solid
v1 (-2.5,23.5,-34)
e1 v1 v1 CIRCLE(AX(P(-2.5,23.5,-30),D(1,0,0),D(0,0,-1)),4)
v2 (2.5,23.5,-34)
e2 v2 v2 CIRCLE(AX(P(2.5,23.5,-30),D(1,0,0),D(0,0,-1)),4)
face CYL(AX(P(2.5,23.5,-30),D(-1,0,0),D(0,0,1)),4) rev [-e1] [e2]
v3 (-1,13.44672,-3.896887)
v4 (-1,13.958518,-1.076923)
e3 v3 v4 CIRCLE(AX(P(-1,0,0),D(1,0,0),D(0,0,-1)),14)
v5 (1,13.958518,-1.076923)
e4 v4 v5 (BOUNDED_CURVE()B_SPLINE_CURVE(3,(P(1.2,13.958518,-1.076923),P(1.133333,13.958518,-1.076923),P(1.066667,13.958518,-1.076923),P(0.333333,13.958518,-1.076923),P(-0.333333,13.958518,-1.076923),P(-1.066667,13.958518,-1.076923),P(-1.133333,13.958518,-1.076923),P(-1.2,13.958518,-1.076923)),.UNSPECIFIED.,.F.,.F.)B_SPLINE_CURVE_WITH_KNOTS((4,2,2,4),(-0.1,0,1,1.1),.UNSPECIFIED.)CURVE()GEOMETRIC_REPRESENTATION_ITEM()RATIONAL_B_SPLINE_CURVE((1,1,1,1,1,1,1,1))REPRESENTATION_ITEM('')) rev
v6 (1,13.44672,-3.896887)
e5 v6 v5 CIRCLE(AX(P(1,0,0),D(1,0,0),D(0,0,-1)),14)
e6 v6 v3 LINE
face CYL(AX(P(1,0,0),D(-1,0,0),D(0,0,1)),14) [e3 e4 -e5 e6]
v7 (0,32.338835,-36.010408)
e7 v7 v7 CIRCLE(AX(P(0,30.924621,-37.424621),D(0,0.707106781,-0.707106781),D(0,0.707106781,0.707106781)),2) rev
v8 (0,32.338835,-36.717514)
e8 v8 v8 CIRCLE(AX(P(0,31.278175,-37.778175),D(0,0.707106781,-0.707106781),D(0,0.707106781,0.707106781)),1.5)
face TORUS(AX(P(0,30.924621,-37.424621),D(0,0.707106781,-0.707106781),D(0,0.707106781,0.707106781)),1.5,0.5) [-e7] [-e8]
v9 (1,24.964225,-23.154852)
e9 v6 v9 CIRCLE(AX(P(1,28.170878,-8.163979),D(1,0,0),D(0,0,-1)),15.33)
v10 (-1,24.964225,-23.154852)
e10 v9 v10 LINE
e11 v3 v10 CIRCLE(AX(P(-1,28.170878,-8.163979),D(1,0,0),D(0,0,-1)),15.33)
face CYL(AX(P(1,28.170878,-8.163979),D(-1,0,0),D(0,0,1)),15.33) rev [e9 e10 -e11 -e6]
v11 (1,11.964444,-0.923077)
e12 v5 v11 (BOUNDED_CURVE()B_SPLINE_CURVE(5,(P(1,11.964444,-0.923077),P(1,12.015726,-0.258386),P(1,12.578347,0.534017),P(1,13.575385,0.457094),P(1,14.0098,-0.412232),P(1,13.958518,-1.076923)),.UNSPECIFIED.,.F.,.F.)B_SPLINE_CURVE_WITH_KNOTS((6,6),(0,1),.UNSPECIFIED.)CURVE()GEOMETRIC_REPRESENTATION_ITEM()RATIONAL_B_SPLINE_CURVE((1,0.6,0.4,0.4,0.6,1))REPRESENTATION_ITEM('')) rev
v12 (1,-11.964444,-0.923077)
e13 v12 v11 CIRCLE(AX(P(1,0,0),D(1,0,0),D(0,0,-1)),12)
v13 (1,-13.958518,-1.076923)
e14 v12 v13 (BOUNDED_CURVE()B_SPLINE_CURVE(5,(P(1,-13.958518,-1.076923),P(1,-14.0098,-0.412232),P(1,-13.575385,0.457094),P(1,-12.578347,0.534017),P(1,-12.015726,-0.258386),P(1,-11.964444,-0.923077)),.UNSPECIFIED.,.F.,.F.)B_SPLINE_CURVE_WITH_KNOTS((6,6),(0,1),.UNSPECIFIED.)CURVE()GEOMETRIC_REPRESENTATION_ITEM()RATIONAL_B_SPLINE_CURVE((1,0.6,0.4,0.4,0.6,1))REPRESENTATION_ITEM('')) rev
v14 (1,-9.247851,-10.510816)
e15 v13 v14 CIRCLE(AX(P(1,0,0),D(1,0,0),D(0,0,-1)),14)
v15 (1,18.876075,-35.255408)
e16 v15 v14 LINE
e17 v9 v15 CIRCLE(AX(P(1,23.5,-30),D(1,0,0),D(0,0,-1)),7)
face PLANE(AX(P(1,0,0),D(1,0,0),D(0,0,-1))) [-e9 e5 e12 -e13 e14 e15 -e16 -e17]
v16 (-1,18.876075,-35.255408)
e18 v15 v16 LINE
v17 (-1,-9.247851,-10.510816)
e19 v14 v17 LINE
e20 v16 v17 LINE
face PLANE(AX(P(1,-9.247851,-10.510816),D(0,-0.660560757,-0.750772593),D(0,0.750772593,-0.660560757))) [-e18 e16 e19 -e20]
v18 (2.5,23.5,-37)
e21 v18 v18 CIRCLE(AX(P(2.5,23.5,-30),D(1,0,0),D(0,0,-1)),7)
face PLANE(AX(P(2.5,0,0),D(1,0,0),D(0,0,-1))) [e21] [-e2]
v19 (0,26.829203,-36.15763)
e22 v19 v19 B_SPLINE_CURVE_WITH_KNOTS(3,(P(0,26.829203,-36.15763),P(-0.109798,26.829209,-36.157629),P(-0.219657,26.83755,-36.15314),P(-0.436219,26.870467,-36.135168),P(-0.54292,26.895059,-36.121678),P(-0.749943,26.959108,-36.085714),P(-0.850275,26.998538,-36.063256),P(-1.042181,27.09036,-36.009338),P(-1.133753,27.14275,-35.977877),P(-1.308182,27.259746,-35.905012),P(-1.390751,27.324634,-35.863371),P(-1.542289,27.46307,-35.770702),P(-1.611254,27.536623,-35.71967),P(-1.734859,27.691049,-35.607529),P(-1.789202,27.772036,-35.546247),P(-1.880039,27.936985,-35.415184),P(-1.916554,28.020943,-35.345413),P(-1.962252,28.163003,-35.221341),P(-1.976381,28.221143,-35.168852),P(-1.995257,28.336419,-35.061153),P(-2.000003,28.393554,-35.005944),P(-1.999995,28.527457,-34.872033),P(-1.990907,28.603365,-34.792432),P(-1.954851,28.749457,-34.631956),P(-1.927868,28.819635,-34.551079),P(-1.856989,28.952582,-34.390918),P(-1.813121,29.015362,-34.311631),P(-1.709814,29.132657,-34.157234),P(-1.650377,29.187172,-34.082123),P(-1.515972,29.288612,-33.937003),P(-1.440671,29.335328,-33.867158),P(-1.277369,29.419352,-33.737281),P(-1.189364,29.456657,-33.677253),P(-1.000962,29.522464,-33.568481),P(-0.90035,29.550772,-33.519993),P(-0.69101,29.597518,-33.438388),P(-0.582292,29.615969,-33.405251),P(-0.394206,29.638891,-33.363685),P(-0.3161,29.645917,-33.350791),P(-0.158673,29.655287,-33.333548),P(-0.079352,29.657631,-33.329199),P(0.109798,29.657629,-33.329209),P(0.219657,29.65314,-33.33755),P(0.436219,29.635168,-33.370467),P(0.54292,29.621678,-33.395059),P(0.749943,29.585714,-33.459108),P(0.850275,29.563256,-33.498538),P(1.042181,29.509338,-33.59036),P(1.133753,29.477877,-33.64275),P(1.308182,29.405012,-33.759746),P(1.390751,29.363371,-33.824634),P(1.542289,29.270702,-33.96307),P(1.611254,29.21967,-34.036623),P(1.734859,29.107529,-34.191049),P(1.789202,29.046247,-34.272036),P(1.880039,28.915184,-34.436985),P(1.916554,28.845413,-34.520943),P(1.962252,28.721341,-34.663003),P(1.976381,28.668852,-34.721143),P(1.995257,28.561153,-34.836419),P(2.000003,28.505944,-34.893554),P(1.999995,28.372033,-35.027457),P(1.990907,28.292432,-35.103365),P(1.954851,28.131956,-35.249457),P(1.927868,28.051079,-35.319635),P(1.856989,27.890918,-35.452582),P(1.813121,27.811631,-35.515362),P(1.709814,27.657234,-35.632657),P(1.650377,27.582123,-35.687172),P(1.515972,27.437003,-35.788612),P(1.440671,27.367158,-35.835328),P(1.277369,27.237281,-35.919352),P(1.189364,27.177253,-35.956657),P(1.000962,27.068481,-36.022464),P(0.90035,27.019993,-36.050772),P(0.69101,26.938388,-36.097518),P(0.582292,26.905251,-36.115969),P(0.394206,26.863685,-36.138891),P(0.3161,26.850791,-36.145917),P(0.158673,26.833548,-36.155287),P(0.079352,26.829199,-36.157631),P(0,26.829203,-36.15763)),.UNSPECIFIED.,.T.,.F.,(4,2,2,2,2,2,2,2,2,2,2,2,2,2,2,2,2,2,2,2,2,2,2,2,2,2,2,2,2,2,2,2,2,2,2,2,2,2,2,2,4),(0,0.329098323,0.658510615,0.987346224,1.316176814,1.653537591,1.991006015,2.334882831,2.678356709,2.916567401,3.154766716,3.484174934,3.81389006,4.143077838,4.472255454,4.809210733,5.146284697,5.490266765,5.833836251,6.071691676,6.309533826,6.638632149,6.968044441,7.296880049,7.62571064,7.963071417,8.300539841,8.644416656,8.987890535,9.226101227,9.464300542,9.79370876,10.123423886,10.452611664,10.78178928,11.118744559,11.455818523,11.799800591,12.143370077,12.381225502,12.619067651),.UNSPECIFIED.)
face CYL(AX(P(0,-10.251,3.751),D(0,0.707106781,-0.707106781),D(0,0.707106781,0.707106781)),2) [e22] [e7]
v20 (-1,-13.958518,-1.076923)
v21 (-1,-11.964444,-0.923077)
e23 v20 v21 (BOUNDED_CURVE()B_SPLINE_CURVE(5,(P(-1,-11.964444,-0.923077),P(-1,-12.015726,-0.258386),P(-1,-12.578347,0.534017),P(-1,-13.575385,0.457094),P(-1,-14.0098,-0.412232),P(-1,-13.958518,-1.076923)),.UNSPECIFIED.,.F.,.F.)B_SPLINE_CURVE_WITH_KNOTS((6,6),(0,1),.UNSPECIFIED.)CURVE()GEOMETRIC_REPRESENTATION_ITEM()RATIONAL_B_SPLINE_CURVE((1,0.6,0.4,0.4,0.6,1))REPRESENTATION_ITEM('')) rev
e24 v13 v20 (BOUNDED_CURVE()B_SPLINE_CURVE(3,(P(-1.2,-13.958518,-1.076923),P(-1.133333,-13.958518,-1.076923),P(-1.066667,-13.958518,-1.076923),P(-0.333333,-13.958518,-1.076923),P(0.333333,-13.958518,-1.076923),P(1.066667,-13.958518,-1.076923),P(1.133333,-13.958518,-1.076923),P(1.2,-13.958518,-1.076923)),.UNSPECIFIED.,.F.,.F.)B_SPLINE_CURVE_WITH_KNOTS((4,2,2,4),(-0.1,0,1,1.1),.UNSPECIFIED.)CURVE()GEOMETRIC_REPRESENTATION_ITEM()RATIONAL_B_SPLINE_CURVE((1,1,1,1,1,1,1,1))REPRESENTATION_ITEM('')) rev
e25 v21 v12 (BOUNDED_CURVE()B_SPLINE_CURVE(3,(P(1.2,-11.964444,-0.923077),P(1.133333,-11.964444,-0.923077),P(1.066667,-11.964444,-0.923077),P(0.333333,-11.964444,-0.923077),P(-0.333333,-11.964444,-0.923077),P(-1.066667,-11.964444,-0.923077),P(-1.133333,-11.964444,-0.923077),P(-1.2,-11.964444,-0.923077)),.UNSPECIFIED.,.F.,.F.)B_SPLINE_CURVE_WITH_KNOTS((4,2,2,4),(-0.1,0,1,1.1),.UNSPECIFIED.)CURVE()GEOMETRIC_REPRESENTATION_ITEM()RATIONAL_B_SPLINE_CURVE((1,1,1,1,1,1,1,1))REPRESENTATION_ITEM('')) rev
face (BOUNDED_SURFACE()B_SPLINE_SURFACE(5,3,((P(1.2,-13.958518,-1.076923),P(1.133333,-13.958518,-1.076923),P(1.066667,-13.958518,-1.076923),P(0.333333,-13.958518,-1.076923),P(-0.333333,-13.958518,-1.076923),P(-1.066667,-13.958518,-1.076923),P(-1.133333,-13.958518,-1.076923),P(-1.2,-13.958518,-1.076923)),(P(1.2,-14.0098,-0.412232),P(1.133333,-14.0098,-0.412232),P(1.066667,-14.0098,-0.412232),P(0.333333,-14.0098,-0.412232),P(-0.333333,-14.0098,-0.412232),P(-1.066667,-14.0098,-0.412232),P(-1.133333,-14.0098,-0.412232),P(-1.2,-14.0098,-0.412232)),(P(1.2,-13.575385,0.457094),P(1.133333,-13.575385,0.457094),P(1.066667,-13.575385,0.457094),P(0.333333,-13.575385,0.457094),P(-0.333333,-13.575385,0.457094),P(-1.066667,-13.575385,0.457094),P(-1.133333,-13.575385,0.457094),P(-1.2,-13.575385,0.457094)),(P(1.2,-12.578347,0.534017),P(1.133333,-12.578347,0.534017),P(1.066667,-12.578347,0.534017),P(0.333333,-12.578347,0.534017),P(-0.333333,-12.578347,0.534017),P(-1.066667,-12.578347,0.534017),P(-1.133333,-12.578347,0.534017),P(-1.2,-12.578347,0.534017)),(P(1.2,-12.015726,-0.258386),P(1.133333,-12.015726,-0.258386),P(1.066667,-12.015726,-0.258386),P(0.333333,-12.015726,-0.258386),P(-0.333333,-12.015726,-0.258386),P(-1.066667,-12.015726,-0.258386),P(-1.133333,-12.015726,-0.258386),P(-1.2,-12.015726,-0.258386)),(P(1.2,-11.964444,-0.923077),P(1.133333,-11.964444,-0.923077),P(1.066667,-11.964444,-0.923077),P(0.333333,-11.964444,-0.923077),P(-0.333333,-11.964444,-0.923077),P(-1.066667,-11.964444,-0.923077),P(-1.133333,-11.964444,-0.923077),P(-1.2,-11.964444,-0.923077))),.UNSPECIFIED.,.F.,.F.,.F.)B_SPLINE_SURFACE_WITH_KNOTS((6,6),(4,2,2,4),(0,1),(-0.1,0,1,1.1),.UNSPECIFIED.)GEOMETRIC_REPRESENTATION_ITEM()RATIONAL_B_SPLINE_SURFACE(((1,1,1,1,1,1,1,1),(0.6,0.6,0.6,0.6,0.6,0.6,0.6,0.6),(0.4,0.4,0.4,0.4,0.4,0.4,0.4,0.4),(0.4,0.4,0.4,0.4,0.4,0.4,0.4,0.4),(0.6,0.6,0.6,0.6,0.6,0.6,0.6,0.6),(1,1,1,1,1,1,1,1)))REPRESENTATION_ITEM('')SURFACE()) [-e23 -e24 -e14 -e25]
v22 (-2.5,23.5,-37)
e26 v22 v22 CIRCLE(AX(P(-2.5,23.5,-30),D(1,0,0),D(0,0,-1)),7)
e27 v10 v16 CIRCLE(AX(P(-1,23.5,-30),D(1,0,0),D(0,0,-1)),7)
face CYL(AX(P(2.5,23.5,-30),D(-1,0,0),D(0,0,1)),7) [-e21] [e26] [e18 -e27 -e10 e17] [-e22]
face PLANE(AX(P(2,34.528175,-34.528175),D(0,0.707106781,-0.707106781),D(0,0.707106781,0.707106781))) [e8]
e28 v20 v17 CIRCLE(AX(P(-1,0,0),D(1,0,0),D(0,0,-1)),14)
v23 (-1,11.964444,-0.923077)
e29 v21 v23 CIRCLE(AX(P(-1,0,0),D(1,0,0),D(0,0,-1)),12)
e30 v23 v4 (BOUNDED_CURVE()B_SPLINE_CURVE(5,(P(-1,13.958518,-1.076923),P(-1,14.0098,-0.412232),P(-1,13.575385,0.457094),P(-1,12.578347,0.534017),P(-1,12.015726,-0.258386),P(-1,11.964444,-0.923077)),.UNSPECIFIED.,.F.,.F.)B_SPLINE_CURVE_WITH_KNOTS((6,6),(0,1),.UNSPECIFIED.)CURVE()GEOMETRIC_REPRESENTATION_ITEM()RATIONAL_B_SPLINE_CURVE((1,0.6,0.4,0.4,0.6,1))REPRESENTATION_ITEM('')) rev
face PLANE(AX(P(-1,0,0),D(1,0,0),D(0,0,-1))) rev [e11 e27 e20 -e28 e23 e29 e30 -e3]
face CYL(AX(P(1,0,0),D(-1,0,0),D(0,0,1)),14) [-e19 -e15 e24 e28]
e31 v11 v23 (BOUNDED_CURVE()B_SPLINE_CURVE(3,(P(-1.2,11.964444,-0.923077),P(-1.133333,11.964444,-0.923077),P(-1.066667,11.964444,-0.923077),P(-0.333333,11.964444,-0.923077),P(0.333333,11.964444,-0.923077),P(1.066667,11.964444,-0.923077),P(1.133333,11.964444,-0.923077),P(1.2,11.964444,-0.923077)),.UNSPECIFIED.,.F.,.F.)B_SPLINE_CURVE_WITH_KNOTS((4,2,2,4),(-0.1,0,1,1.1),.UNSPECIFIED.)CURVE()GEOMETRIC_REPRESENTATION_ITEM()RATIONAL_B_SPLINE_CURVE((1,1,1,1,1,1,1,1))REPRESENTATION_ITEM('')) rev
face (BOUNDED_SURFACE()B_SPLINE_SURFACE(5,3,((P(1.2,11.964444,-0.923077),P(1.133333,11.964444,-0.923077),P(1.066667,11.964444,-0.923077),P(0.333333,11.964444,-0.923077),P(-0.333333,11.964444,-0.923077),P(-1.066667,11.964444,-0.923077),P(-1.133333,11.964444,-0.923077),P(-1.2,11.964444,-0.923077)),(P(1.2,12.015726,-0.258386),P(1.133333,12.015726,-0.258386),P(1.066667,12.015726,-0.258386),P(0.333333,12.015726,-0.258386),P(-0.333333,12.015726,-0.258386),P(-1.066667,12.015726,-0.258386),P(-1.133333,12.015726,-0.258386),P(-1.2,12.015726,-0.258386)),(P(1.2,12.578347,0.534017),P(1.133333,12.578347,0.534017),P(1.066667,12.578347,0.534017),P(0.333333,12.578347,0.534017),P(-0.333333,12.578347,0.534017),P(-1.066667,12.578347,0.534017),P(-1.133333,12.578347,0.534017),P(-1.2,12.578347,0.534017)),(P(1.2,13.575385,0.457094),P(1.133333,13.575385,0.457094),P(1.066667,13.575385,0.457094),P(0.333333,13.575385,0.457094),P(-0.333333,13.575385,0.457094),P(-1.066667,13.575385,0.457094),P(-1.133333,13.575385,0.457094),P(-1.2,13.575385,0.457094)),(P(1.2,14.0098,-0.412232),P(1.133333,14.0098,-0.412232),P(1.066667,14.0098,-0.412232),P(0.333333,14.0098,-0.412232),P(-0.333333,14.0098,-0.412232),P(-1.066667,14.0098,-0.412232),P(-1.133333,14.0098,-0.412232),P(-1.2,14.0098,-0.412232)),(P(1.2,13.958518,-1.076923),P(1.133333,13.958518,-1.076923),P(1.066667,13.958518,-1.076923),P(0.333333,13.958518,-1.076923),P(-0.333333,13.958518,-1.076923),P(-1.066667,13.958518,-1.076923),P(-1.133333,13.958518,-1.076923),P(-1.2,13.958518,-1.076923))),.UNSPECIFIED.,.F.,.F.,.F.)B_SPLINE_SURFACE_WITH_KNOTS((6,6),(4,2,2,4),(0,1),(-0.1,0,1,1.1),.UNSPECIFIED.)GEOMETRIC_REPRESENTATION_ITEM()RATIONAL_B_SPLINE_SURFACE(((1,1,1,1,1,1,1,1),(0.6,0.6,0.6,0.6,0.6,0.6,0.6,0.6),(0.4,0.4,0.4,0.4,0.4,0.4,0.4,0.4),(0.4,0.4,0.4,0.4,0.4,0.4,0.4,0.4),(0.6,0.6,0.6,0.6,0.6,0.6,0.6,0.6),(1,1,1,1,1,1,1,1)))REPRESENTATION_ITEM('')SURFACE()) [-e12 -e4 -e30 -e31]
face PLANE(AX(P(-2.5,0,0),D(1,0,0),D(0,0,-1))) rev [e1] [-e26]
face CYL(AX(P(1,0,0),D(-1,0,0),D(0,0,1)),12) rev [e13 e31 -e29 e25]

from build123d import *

# Parameters (mm, degrees)
BOSS_EXTRUDE1_DEPTH     = 1
SKETCH1_3_R             = 7
SKETCH1_3_R_2           = 4
BOSS_EXTRUDE2_DEPTH     = 2.5
BOSS_EXTRUDE3_DEPTH     = 2
CUT_EXTRUDE1_REACH      = 61.611
CUT_EXTRUDE1_END_RADIUS = 7
FILLET1_R               = 0.5
FILLET2_START           = -2
FILLET2_DEPTH           = 4
FILLET3_START           = -2
FILLET3_DEPTH           = 4


with BuildPart() as part:
    # Sketch1 → Boss-Extrude1 (new, symmetric)
    with BuildSketch(Plane.YZ):
        with BuildLine():
            Line((-9.247850598, -10.510816301), (18.876074701, -35.255408151))
            ThreePointArc((18.876074701, -35.255408151), (17.246857686, -26.853857727), (24.964224943, -23.154852426))
            ThreePointArc((24.964224943, -23.154852426), (15.014290028, -16.032467293), (13.446719603, -3.896887464))
            ThreePointArc((13.446719603, -3.896887464), (13.860989763, -1.967984445), (14, 0))
            Line((14, 0), (12, 0))
            ThreePointArc((12, 0), (0, -12), (-12, 0))
            Line((-12, 0), (-14, 0))
            ThreePointArc((-14, 0), (-12.756761117, -5.767585788), (-9.247850598, -10.510816301))
        make_face()
    extrude(amount=BOSS_EXTRUDE1_DEPTH, both=True)

    # Sketch1<3> → Boss-Extrude2 (add, symmetric)
    with BuildSketch(Plane.YZ):
        with Locations(Location((23.5, -30, 0), (0, 0, 270))):
            Circle(SKETCH1_3_R)
        with Locations(Location((23.5, -30, 0), (0, 0, 270))):
            Circle(SKETCH1_3_R_2, mode=Mode.SUBTRACT)
    extrude(amount=BOSS_EXTRUDE2_DEPTH, both=True)

    # Sketch1<4> → Boss-Extrude3 (add, symmetric)
    with BuildSketch(Plane.YZ):
        with BuildLine():
            ThreePointArc((29.657630053, -33.329202928), (29.11248608, -34.183300133), (28.449747468, -34.949747468))
            Line((28.449747468, -34.949747468), (31.278174593, -37.778174593))
            Line((31.278174593, -37.778174593), (32.692388155, -36.363961031))
            Line((32.692388155, -36.363961031), (29.657630053, -33.329202928))
        make_face()
        with BuildLine():
            ThreePointArc((28.449747468, -34.949747468), (27.683300133, -35.61248608), (26.829202928, -36.157630053))
            Line((26.829202928, -36.157630053), (29.863961031, -39.192388155))
            Line((29.863961031, -39.192388155), (31.278174593, -37.778174593))
            Line((31.278174593, -37.778174593), (28.449747468, -34.949747468))
        make_face()
    extrude(amount=BOSS_EXTRUDE3_DEPTH, both=True)

    # Cut-Extrude1: up to this cylinder (the profile starts outside it)
    cut_extrude1_end = Plane(origin=(0, 23.5, -30), z_dir=(-1, 0, 0)) * Cylinder(CUT_EXTRUDE1_END_RADIUS, 141.328528, mode=Mode.PRIVATE)
    # Sketch2 → Cut-Extrude1 (cut, up to the surface)
    with BuildSketch(Plane(origin=(0, 34.528174593, -34.528174593), x_dir=(-1, 0, 0), z_dir=(0, 0.707106781186549, -0.7071067811865461)), mode=Mode.PRIVATE) as cut_extrude1_sk1:
        with BuildLine():
            ThreePointArc((-2, -4.596194078), (-1.414213562, -3.181980515), (0, -2.596194078))
            Line((0, -2.596194078), (-2, -2.596194078))
            Line((-2, -2.596194078), (-2, -4.596194078))
        make_face()
    cut_extrude1_tool1 = extrude(cut_extrude1_sk1.sketch, amount=-CUT_EXTRUDE1_REACH, mode=Mode.PRIVATE) - cut_extrude1_end
    add(cut_extrude1_tool1.solids().sort_by_distance((1.553264, 32.376498, -36.679851))[0], mode=Mode.SUBTRACT)
    # Sketch2 → Cut-Extrude1 (cut, up to the surface)
    with BuildSketch(Plane(origin=(0, 34.528174593, -34.528174593), x_dir=(-1, 0, 0), z_dir=(0, 0.707106781186549, -0.7071067811865461)), mode=Mode.PRIVATE) as cut_extrude1_sk2:
        with BuildLine():
            ThreePointArc((0, -2.596194078), (1.414213562, -3.181980515), (2, -4.596194078))
            Line((2, -4.596194078), (2, -2.596194078))
            Line((2, -2.596194078), (0, -2.596194078))
        make_face()
    cut_extrude1_tool2 = extrude(cut_extrude1_sk2.sketch, amount=-CUT_EXTRUDE1_REACH, mode=Mode.PRIVATE) - cut_extrude1_end
    add(cut_extrude1_tool2.solids().sort_by_distance((-1.553264, 32.376498, -36.679851))[0], mode=Mode.SUBTRACT)
    # Sketch2 → Cut-Extrude1 (cut, up to the surface)
    with BuildSketch(Plane(origin=(0, 34.528174593, -34.528174593), x_dir=(-1, 0, 0), z_dir=(0, 0.707106781186549, -0.7071067811865461)), mode=Mode.PRIVATE) as cut_extrude1_sk3:
        with BuildLine():
            Line((1.9e-08, -6.596194078), (2, -6.596194078))
            Line((2, -6.596194078), (2, -4.596194078))
            ThreePointArc((2, -4.596194078), (1.414213569, -6.010407633), (1.9e-08, -6.596194078))
        make_face()
    cut_extrude1_tool3 = extrude(cut_extrude1_sk3.sketch, amount=-CUT_EXTRUDE1_REACH, mode=Mode.PRIVATE) - cut_extrude1_end
    add(cut_extrude1_tool3.solids().sort_by_distance((-1.553264, 30.179851, -38.876498))[0], mode=Mode.SUBTRACT)
    # Sketch2 → Cut-Extrude1 (cut, up to the surface)
    with BuildSketch(Plane(origin=(0, 34.528174593, -34.528174593), x_dir=(-1, 0, 0), z_dir=(0, 0.707106781186549, -0.7071067811865461)), mode=Mode.PRIVATE) as cut_extrude1_sk4:
        with BuildLine():
            Line((-2, -6.596194078), (1.9e-08, -6.596194078))
            ThreePointArc((1.9e-08, -6.596194078), (-1.414213556, -6.010407647), (-2, -4.596194078))
            Line((-2, -4.596194078), (-2, -6.596194078))
        make_face()
    cut_extrude1_tool4 = extrude(cut_extrude1_sk4.sketch, amount=-CUT_EXTRUDE1_REACH, mode=Mode.PRIVATE) - cut_extrude1_end
    add(cut_extrude1_tool4.solids().sort_by_distance((1.553264, 30.179851, -38.876498))[0], mode=Mode.SUBTRACT)

    # Fillet1
    fillet1_edges = [part.edges().sort_by_distance(p)[0] for p in [
        (0, 29.863961031, -39.192388155),
    ]]
    fillet(fillet1_edges, radius=FILLET1_R)

    # Fillet2: read off the stored shape, not the designer's step
    # Fillet2 outline → Fillet2 (cut)
    with BuildSketch(Plane.YZ.offset(FILLET2_START)):
        with BuildLine():
            ThreePointArc((-14, 0), (-13.989625763, -0.538860843), (-13.958518428, -1.076923077))
            add(Edge.make_bspline(
                [(-13.958518428, -1.076923077), (-13.978684128, -0.815545726), (-13.917861816, -0.505978869), (-13.724957355, -0.19992372), (-13.383008233, 5e-09), (-12.961481386, 0)],
                knots=[0, 0, 0, 0, 0, 0, 0.519259304, 0.519259304, 0.519259304, 0.519259304, 0.519259304, 0.519259304], degree=5, weights=[1, 0.792296278, 0.638518602, 0.53866697, 0.492741383, 0.500741842]))
            Line((-12.961481386, 0), (-14, 0))
        make_face()
        with BuildLine():
            Line((-12, 0), (-12.961481386, 0))
            add(Edge.make_bspline(
                [(-12.961481386, 0), (-12.583056271, -4e-09), (-12.270553606, -0.164313436), (-12.073438627, -0.418546888), (-11.982758039, -0.685704598), (-11.964444366, -0.923076923)],
                knots=[0.519259304, 0.519259304, 0.519259304, 0.519259304, 0.519259304, 0.519259304, 1, 1, 1, 1, 1, 1], degree=5, weights=[0.500741842, 0.508148827, 0.561778135, 0.661629767, 0.807703722, 1]))
            ThreePointArc((-11.964444366, -0.923076923), (-11.991107797, -0.461880723), (-12, 0))
        make_face()
    extrude(amount=FILLET2_DEPTH, mode=Mode.SUBTRACT)

    # Fillet3: read off the stored shape, not the designer's step
    # Fillet3 outline → Fillet3 (cut)
    with BuildSketch(Plane.YZ.offset(FILLET3_START)):
        with BuildLine():
            ThreePointArc((12, 0), (11.991107797, -0.461880723), (11.964444366, -0.923076923))
            add(Edge.make_bspline(
                [(11.964444366, -0.923076923), (11.982758039, -0.685704597), (12.073438628, -0.418546886), (12.270553609, -0.164313433), (12.583056275, -2e-09), (12.961481392, 0)],
                knots=[0, 0, 0, 0, 0, 0, 0.480740697, 0.480740697, 0.480740697, 0.480740697, 0.480740697, 0.480740697], degree=5, weights=[1, 0.807703721, 0.661629766, 0.561778134, 0.508148826, 0.500741841]))
            Line((12.961481392, 0), (12, 0))
        make_face()
        with BuildLine():
            Line((14, 0), (12.961481392, 0))
            add(Edge.make_bspline(
                [(12.961481392, 0), (13.383008238, 2e-09), (13.724957357, -0.199923723), (13.917861817, -0.505978871), (13.978684128, -0.815545728), (13.958518427, -1.076923077)],
                knots=[0.480740697, 0.480740697, 0.480740697, 0.480740697, 0.480740697, 0.480740697, 1, 1, 1, 1, 1, 1], degree=5, weights=[0.500741841, 0.492741384, 0.538666971, 0.638518602, 0.792296279, 1]))
            ThreePointArc((13.958518427, -1.076923077), (13.989625763, -0.538860843), (14, 0))
        make_face()
    extrude(amount=FILLET3_DEPTH, mode=Mode.SUBTRACT)


solid = part.part
